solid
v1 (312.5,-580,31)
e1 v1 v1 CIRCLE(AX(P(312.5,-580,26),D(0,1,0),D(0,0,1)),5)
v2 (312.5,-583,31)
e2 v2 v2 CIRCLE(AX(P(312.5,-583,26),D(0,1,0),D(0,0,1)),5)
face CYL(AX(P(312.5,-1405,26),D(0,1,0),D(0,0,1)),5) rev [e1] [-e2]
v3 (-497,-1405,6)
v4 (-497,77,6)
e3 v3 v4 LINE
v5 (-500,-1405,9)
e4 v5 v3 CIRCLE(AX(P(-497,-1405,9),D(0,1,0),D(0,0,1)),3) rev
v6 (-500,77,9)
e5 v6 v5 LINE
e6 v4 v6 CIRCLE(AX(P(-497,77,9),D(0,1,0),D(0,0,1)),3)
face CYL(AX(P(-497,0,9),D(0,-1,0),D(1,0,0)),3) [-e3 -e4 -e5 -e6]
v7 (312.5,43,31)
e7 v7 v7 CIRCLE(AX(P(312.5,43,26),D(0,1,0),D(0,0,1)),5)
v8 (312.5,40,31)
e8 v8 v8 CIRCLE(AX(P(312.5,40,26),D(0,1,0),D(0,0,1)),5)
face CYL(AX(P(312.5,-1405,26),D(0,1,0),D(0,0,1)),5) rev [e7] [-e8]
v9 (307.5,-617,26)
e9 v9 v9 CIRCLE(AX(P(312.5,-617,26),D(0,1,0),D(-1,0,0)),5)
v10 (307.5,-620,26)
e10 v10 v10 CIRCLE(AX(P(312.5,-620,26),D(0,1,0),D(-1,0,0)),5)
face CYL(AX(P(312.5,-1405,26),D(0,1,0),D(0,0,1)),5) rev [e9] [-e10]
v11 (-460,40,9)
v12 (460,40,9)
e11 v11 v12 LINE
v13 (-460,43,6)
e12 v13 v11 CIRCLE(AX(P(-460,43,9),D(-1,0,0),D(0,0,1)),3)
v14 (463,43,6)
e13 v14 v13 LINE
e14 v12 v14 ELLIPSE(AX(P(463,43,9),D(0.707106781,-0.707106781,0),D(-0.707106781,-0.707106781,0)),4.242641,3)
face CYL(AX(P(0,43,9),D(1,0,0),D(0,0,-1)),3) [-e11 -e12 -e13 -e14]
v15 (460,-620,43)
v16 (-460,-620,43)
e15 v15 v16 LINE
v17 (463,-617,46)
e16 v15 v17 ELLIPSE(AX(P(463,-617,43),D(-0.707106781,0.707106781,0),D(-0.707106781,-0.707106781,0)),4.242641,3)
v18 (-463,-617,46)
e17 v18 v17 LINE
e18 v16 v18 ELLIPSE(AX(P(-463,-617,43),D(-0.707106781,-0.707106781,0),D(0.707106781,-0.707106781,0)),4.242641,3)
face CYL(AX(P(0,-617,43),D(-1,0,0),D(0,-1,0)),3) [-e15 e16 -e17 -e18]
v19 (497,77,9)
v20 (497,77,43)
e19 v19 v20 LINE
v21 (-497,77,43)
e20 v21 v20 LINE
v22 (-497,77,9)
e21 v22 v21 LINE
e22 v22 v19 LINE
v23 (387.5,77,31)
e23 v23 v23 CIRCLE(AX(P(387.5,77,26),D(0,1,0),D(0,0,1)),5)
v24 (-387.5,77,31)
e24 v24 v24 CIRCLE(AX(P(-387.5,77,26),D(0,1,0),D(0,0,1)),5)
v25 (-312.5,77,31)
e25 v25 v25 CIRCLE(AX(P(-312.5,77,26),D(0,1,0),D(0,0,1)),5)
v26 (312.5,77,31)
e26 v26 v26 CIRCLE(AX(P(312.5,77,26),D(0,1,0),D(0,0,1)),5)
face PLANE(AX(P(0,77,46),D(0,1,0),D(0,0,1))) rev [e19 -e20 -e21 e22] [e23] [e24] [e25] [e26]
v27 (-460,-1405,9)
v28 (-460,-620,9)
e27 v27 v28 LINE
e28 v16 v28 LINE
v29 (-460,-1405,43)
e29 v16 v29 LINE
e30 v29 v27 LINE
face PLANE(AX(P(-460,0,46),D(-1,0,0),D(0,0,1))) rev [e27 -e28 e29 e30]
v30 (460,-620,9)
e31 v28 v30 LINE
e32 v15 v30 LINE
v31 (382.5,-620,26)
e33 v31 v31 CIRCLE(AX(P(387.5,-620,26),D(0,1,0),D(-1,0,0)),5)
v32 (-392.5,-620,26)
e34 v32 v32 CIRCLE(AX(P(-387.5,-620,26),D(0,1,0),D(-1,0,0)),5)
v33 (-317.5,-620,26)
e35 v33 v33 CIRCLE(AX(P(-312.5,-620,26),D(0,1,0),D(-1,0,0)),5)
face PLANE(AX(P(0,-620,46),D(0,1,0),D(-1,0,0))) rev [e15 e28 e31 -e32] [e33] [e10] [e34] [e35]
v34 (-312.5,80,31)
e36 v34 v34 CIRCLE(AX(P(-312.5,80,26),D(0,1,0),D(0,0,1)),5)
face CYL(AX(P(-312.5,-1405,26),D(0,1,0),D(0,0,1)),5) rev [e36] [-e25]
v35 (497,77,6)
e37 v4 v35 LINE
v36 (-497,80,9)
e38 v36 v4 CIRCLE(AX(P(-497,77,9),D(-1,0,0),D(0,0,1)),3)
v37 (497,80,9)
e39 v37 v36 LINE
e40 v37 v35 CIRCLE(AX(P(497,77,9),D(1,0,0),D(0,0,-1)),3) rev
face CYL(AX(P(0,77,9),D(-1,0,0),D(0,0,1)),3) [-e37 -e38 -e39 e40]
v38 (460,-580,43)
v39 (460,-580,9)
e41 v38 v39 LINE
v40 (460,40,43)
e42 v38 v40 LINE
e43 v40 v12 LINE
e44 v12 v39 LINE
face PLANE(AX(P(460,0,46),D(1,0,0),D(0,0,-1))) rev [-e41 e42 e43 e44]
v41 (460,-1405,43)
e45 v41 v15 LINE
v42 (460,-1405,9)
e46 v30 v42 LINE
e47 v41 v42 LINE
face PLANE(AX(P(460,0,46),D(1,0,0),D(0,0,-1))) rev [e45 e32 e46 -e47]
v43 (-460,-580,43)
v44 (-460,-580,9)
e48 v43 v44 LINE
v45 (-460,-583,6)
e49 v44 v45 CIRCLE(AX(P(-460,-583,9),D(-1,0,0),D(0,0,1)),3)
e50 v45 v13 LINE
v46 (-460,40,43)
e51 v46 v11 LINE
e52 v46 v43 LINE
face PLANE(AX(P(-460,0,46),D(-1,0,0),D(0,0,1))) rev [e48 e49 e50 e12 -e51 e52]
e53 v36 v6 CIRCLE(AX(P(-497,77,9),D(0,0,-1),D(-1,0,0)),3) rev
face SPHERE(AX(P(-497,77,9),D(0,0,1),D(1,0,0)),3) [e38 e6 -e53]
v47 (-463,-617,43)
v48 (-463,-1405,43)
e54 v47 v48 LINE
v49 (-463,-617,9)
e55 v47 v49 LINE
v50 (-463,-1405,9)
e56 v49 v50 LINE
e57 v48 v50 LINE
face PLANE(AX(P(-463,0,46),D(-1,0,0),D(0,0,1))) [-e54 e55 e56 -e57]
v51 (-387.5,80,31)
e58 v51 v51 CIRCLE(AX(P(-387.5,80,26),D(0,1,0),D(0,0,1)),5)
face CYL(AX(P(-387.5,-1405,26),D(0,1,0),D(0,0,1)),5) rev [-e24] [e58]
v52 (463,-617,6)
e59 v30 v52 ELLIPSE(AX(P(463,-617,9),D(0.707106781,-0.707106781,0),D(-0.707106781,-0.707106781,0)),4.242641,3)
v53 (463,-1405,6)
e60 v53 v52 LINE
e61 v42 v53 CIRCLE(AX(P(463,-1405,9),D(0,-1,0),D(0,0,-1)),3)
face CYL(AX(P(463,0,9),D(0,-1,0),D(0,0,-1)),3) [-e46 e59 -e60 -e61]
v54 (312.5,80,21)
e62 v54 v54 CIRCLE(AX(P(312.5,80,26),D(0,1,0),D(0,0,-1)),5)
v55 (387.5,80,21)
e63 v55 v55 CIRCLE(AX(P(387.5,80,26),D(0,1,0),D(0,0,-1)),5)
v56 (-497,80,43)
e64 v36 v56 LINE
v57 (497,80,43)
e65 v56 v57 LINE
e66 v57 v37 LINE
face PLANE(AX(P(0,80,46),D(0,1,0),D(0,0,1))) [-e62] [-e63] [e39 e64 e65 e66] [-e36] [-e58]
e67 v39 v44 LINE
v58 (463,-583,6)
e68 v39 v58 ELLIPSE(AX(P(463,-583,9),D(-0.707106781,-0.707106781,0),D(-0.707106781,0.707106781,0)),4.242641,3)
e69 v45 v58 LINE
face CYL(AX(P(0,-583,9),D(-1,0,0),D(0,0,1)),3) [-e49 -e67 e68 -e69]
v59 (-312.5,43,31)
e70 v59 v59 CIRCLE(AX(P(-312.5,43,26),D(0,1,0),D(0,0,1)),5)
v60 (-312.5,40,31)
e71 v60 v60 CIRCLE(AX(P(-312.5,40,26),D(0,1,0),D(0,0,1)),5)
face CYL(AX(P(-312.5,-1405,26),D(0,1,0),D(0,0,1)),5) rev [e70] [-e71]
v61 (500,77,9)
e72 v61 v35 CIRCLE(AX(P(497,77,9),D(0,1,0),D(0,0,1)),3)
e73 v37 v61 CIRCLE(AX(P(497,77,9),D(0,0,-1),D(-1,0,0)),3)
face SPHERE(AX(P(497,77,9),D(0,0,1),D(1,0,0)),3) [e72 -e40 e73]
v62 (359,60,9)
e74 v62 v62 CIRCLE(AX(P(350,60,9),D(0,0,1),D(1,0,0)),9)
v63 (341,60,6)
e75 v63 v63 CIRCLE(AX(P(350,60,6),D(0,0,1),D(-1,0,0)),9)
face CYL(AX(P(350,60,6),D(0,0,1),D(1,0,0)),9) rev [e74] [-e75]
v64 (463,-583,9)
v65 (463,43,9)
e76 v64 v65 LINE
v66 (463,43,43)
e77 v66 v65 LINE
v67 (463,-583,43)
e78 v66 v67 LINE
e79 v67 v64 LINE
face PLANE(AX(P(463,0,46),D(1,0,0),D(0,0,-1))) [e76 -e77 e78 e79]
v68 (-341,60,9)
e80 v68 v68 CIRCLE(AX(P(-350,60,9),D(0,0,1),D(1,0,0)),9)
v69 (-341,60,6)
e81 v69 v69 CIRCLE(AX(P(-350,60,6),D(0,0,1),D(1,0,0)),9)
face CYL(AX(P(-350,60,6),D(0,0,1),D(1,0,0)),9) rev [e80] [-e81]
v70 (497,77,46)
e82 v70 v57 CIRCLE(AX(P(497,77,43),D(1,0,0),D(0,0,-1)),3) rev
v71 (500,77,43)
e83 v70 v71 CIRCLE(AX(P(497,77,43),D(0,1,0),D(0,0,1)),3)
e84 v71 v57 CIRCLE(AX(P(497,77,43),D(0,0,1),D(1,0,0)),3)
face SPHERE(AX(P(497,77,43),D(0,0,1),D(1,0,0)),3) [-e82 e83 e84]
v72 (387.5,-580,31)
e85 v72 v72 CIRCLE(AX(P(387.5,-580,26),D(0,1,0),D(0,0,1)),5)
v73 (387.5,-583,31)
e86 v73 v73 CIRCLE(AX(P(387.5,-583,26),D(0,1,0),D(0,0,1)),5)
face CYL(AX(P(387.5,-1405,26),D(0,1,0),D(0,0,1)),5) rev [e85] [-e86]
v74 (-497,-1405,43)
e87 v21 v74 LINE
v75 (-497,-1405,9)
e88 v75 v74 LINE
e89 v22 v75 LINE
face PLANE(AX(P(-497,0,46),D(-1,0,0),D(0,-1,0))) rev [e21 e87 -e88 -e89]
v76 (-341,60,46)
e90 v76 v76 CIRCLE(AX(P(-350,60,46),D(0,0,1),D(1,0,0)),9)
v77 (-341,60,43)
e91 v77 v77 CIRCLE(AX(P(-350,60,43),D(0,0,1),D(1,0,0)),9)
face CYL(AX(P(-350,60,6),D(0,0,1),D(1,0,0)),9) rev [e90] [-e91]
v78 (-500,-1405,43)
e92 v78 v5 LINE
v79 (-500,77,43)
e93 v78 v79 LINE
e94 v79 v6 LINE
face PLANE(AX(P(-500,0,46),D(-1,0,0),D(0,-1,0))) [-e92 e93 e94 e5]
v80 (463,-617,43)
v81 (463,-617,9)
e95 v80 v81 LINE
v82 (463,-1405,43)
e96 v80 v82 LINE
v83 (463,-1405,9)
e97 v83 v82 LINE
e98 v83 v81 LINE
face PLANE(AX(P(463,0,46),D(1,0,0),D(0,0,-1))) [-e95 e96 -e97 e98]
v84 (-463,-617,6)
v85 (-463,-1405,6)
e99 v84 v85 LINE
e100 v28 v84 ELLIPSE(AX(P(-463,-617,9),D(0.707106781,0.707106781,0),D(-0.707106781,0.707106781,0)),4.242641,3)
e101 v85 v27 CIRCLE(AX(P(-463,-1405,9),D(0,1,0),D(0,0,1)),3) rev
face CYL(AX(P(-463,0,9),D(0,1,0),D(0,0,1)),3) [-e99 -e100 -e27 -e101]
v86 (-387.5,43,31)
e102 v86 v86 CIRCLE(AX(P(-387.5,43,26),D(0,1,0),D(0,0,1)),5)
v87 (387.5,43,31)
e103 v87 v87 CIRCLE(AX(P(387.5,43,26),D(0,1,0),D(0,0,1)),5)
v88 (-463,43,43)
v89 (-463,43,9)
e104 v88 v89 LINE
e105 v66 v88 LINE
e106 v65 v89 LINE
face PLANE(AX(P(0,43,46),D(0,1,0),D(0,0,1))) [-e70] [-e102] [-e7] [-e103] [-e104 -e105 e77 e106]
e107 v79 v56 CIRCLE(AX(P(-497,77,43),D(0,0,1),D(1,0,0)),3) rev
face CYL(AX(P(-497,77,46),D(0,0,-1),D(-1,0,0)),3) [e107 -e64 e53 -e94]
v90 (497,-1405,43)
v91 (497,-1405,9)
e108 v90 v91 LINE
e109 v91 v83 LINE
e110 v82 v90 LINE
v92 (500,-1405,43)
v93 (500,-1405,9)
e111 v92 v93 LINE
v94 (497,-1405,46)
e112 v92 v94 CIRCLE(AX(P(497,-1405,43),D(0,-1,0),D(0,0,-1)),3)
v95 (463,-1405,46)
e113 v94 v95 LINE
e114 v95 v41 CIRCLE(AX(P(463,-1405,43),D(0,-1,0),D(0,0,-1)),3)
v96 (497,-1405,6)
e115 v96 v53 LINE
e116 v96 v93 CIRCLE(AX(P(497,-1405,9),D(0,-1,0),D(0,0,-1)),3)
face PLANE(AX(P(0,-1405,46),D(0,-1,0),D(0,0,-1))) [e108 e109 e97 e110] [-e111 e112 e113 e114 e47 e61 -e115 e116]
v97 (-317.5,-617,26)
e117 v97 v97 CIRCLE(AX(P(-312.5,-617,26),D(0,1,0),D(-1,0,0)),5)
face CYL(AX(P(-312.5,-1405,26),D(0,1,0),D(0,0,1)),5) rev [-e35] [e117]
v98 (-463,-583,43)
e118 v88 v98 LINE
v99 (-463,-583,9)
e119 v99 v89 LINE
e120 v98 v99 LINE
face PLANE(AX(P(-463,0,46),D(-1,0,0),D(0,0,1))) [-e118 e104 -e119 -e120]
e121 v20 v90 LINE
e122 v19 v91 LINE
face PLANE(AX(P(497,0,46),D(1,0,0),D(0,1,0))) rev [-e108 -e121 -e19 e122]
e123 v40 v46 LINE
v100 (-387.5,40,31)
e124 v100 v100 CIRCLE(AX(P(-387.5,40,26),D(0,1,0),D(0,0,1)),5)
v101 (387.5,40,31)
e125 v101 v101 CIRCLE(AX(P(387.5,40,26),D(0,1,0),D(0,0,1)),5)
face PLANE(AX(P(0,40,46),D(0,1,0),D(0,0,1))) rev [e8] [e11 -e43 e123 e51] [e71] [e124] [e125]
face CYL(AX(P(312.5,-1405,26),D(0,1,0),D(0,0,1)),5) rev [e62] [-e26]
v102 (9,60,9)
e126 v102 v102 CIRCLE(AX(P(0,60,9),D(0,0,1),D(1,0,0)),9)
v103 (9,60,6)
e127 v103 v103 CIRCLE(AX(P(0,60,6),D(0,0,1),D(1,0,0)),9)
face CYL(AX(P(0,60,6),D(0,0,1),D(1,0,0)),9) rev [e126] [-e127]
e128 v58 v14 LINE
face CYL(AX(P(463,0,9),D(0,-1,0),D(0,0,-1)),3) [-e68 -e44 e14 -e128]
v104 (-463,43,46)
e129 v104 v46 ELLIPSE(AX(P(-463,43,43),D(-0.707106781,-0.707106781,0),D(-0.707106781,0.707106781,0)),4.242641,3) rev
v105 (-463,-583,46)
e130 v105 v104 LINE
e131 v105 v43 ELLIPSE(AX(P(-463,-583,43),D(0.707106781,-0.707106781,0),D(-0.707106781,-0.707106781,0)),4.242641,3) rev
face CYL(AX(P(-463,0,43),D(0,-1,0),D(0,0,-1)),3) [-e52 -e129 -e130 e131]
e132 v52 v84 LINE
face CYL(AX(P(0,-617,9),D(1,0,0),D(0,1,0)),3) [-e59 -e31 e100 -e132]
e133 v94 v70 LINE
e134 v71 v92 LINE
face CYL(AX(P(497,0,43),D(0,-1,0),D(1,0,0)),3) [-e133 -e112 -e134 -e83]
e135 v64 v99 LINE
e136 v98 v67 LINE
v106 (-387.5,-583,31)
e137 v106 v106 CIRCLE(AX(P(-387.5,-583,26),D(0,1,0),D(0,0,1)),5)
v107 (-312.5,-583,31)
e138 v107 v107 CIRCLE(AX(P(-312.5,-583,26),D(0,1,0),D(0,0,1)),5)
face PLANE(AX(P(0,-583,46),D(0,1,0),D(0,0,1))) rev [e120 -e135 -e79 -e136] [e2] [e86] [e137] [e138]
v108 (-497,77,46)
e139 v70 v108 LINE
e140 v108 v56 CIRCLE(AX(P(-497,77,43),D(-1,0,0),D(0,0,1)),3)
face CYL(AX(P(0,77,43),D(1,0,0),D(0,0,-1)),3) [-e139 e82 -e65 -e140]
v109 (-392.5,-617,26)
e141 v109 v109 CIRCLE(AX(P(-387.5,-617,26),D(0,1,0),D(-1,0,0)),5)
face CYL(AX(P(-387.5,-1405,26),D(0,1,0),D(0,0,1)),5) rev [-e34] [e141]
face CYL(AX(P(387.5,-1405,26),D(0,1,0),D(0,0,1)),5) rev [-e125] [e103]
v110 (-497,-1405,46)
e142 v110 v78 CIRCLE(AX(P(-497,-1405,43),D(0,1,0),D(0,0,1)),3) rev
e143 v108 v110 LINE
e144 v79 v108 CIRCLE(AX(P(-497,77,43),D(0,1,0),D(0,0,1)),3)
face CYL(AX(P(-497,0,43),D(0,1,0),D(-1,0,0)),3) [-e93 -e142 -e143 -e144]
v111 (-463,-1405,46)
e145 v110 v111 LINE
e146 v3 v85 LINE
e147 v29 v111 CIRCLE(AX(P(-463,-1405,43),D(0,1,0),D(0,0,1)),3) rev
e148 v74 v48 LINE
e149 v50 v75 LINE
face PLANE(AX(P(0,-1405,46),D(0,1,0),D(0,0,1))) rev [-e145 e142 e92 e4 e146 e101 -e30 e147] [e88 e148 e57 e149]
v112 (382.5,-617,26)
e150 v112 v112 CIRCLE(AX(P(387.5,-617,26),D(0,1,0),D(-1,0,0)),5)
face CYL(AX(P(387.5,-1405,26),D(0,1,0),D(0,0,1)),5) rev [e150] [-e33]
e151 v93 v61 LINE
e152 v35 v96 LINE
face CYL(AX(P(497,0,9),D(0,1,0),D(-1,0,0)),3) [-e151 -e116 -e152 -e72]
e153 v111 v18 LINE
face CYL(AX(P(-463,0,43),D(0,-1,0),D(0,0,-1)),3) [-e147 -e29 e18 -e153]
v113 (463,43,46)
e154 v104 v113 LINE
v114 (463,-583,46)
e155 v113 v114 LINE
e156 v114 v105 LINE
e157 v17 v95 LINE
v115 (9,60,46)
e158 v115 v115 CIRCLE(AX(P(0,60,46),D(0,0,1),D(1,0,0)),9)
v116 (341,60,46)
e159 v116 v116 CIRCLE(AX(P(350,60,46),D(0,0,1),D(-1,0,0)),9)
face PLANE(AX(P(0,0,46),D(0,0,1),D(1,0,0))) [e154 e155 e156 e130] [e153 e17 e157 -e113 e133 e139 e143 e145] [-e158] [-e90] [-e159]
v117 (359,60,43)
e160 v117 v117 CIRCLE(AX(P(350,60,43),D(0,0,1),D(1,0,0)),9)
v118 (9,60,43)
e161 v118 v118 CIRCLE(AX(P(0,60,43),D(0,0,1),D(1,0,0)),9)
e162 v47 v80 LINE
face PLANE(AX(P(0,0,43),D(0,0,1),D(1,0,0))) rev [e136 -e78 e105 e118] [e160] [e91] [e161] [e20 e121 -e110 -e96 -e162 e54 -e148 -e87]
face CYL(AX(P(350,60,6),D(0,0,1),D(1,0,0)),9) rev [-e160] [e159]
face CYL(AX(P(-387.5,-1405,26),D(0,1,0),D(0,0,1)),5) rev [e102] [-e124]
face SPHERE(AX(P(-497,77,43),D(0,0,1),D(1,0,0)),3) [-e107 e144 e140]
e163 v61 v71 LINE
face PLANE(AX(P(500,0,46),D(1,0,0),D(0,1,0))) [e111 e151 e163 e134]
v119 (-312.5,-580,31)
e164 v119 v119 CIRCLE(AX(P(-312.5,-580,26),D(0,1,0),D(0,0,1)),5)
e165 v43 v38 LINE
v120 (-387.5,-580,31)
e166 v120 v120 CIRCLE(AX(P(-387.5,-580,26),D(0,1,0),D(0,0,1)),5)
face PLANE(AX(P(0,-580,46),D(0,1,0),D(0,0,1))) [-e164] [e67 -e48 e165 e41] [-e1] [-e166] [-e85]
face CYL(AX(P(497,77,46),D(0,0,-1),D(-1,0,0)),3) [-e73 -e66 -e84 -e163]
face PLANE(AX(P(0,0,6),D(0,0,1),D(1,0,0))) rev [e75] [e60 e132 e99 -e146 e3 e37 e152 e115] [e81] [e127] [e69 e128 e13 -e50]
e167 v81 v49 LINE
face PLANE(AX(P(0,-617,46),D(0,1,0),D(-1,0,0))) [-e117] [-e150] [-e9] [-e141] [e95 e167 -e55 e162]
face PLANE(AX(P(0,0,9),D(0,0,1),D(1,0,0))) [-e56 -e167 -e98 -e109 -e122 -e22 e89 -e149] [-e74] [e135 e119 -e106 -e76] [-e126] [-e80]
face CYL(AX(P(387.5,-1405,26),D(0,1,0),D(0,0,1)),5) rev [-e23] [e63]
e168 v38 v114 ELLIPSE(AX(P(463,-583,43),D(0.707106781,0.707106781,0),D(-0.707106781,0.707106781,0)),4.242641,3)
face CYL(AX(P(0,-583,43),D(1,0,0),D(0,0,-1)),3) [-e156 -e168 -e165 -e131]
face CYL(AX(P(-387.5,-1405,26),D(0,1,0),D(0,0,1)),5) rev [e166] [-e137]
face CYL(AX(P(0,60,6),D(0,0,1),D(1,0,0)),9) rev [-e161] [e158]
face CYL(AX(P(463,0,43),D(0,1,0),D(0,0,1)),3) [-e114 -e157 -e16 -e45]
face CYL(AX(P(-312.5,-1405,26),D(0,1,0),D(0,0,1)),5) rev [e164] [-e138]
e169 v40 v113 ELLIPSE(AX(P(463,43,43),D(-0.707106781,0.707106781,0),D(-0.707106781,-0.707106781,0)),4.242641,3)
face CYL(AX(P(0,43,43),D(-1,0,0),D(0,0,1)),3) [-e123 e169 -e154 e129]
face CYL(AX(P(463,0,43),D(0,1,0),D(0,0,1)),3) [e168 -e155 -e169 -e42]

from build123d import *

# Parameters (mm, degrees)
SKETCH1_W               = 920
SKETCH1_H               = 40
BOSS_EXTRUDE1_DEPTH     = 40
FILLET1_R               = 3
SHELL1_START            = -497
SHELL1_OUTLINE_W        = 34
SHELL1_OUTLINE_H        = 34
SHELL1_DEPTH            = 994
SHELL1_2_OUTLINE_W      = 626
SHELL1_2_OUTLINE_H      = 34
SHELL1_2_OUTLINE_W_2    = 785
SHELL1_2_DEPTH          = 34
SHELL1_START_2          = 463
SHELL1_3_OUTLINE_W      = 626
SHELL1_3_OUTLINE_H      = 34
SHELL1_3_OUTLINE_W_2    = 785
SHELL1_3_DEPTH          = 34
SKETCH4_R               = 9
CUT_EXTRUDE2_DEPTH      = 1492.852874784
SKETCH5_W               = 34
SKETCH5_H               = 34
CUT_EXTRUDE3_DEPTH      = 1565.749181179
CUT_EXTRUDE4_DEPTH      = 966.7851728
CUT_EXTRUDE4_DEPTH_BACK = 966.7851728
SKETCH6_R               = 5


# Read off the part's stored shape, not the designer's step: Shell1
with BuildPart() as part:
    # Sketch1 → Boss-Extrude1 (new body)
    with BuildSketch(Plane.XY.offset(6)):
        Polygon((500, -1405), (460, -1405), (460, 40), (-460, 40), (-460, -1405), (-500, -1405), (-500, 80), (500, 80), align=None)
        with Locations((0, -600)):
            Rectangle(SKETCH1_W, SKETCH1_H)
        Polygon((-460, -1405), (-460, 40), (-500, 80), (-500, -1405), align=None)
        Polygon((-460, 40), (460, 40), (500, 80), (-500, 80), align=None)
    extrude(amount=BOSS_EXTRUDE1_DEPTH)

    # Fillet1
    fillet1_edges = [part.edges().sort_by_distance(p)[0] for p in [
        (0, 40, 6),
        (460, -270, 6),
        (0, -580, 6),
        (-500, -662.5, 6),
        (-460, -1012.5, 6),
        (0, -620, 6),
        (460, -1012.5, 6),
        (500, -662.5, 6),
        (500, 80, 26),
        (-500, 80, 26),
        (0, 80, 6),
        (0, -580, 46),
        (460, -270, 46),
        (0, 40, 46),
        (-460, -270, 46),
        (500, -662.5, 46),
        (460, -1012.5, 46),
        (0, -620, 46),
        (-460, -1012.5, 46),
        (-500, -662.5, 46),
        (0, 80, 46),
    ]]
    fillet(fillet1_edges, radius=FILLET1_R)

    # Shell1 outline → Shell1 (cut)
    with BuildSketch(Plane.YZ.offset(SHELL1_START)):
        with Locations((60, 26)):
            Rectangle(SHELL1_OUTLINE_W, SHELL1_OUTLINE_H)
        with Locations((-600, 26)):
            Rectangle(SHELL1_OUTLINE_W, SHELL1_OUTLINE_H)
    extrude(amount=SHELL1_DEPTH, mode=Mode.SUBTRACT)

    # Shell1 2 outline → Shell1 2 (cut)
    with BuildSketch(Plane.YZ.offset(SHELL1_START)):
        with Locations((-270, 26)):
            Rectangle(SHELL1_2_OUTLINE_W, SHELL1_2_OUTLINE_H)
        with Locations((-1009.5, 26)):
            Rectangle(SHELL1_2_OUTLINE_W_2, SHELL1_2_OUTLINE_H)
    extrude(amount=SHELL1_2_DEPTH, mode=Mode.SUBTRACT)

    # Shell1 3 outline → Shell1 3 (cut)
    with BuildSketch(Plane.YZ.offset(SHELL1_START_2)):
        with Locations((-270, 26)):
            Rectangle(SHELL1_3_OUTLINE_W, SHELL1_3_OUTLINE_H)
        with Locations((-1009.5, 26)):
            Rectangle(SHELL1_3_OUTLINE_W_2, SHELL1_3_OUTLINE_H)
    extrude(amount=SHELL1_3_DEPTH, mode=Mode.SUBTRACT)

    # Sketch4 → Cut-Extrude2 (cut, through all)
    with BuildSketch(Plane.XY.offset(46)):
        with Locations((-350, 60)):
            Circle(SKETCH4_R)
        with Locations((0, 60)):
            Circle(SKETCH4_R)
        with Locations((350, 60)):
            Circle(SKETCH4_R)
    extrude(amount=-CUT_EXTRUDE2_DEPTH, mode=Mode.SUBTRACT)

    # Sketch5 → Cut-Extrude3 (cut, through all)
    with BuildSketch(Plane(origin=(0, -1402, 0), x_dir=(1, 0, 0), z_dir=(0, 1, 0))):
        with Locations((480, -26)):
            Rectangle(SKETCH5_W, SKETCH5_H)
        with Locations((-480, -26)):
            Rectangle(SKETCH5_W, SKETCH5_H)
    extrude(amount=-CUT_EXTRUDE3_DEPTH, mode=Mode.SUBTRACT)

    # Sketch6 → Cut-Extrude4 (cut, two sides: drawn at the far end of the back side and taken through both)
    with BuildSketch(Plane(origin=(0, -580, 0), x_dir=(1, 0, 0), z_dir=(0, 1, 0)).offset(-CUT_EXTRUDE4_DEPTH_BACK)):
        with Locations(Location((-387.5, -26, 0), (0, 0, 270))):
            Circle(SKETCH6_R)
        with Locations(Location((-312.5, -26, 0), (0, 0, 270))):
            Circle(SKETCH6_R)
        with Locations(Location((312.5, -26, 0), (0, 0, 270))):
            Circle(SKETCH6_R)
        with Locations(Location((387.5, -26, 0), (0, 0, 270))):
            Circle(SKETCH6_R)
    extrude(amount=CUT_EXTRUDE4_DEPTH + CUT_EXTRUDE4_DEPTH_BACK, mode=Mode.SUBTRACT)


solid = part.part
